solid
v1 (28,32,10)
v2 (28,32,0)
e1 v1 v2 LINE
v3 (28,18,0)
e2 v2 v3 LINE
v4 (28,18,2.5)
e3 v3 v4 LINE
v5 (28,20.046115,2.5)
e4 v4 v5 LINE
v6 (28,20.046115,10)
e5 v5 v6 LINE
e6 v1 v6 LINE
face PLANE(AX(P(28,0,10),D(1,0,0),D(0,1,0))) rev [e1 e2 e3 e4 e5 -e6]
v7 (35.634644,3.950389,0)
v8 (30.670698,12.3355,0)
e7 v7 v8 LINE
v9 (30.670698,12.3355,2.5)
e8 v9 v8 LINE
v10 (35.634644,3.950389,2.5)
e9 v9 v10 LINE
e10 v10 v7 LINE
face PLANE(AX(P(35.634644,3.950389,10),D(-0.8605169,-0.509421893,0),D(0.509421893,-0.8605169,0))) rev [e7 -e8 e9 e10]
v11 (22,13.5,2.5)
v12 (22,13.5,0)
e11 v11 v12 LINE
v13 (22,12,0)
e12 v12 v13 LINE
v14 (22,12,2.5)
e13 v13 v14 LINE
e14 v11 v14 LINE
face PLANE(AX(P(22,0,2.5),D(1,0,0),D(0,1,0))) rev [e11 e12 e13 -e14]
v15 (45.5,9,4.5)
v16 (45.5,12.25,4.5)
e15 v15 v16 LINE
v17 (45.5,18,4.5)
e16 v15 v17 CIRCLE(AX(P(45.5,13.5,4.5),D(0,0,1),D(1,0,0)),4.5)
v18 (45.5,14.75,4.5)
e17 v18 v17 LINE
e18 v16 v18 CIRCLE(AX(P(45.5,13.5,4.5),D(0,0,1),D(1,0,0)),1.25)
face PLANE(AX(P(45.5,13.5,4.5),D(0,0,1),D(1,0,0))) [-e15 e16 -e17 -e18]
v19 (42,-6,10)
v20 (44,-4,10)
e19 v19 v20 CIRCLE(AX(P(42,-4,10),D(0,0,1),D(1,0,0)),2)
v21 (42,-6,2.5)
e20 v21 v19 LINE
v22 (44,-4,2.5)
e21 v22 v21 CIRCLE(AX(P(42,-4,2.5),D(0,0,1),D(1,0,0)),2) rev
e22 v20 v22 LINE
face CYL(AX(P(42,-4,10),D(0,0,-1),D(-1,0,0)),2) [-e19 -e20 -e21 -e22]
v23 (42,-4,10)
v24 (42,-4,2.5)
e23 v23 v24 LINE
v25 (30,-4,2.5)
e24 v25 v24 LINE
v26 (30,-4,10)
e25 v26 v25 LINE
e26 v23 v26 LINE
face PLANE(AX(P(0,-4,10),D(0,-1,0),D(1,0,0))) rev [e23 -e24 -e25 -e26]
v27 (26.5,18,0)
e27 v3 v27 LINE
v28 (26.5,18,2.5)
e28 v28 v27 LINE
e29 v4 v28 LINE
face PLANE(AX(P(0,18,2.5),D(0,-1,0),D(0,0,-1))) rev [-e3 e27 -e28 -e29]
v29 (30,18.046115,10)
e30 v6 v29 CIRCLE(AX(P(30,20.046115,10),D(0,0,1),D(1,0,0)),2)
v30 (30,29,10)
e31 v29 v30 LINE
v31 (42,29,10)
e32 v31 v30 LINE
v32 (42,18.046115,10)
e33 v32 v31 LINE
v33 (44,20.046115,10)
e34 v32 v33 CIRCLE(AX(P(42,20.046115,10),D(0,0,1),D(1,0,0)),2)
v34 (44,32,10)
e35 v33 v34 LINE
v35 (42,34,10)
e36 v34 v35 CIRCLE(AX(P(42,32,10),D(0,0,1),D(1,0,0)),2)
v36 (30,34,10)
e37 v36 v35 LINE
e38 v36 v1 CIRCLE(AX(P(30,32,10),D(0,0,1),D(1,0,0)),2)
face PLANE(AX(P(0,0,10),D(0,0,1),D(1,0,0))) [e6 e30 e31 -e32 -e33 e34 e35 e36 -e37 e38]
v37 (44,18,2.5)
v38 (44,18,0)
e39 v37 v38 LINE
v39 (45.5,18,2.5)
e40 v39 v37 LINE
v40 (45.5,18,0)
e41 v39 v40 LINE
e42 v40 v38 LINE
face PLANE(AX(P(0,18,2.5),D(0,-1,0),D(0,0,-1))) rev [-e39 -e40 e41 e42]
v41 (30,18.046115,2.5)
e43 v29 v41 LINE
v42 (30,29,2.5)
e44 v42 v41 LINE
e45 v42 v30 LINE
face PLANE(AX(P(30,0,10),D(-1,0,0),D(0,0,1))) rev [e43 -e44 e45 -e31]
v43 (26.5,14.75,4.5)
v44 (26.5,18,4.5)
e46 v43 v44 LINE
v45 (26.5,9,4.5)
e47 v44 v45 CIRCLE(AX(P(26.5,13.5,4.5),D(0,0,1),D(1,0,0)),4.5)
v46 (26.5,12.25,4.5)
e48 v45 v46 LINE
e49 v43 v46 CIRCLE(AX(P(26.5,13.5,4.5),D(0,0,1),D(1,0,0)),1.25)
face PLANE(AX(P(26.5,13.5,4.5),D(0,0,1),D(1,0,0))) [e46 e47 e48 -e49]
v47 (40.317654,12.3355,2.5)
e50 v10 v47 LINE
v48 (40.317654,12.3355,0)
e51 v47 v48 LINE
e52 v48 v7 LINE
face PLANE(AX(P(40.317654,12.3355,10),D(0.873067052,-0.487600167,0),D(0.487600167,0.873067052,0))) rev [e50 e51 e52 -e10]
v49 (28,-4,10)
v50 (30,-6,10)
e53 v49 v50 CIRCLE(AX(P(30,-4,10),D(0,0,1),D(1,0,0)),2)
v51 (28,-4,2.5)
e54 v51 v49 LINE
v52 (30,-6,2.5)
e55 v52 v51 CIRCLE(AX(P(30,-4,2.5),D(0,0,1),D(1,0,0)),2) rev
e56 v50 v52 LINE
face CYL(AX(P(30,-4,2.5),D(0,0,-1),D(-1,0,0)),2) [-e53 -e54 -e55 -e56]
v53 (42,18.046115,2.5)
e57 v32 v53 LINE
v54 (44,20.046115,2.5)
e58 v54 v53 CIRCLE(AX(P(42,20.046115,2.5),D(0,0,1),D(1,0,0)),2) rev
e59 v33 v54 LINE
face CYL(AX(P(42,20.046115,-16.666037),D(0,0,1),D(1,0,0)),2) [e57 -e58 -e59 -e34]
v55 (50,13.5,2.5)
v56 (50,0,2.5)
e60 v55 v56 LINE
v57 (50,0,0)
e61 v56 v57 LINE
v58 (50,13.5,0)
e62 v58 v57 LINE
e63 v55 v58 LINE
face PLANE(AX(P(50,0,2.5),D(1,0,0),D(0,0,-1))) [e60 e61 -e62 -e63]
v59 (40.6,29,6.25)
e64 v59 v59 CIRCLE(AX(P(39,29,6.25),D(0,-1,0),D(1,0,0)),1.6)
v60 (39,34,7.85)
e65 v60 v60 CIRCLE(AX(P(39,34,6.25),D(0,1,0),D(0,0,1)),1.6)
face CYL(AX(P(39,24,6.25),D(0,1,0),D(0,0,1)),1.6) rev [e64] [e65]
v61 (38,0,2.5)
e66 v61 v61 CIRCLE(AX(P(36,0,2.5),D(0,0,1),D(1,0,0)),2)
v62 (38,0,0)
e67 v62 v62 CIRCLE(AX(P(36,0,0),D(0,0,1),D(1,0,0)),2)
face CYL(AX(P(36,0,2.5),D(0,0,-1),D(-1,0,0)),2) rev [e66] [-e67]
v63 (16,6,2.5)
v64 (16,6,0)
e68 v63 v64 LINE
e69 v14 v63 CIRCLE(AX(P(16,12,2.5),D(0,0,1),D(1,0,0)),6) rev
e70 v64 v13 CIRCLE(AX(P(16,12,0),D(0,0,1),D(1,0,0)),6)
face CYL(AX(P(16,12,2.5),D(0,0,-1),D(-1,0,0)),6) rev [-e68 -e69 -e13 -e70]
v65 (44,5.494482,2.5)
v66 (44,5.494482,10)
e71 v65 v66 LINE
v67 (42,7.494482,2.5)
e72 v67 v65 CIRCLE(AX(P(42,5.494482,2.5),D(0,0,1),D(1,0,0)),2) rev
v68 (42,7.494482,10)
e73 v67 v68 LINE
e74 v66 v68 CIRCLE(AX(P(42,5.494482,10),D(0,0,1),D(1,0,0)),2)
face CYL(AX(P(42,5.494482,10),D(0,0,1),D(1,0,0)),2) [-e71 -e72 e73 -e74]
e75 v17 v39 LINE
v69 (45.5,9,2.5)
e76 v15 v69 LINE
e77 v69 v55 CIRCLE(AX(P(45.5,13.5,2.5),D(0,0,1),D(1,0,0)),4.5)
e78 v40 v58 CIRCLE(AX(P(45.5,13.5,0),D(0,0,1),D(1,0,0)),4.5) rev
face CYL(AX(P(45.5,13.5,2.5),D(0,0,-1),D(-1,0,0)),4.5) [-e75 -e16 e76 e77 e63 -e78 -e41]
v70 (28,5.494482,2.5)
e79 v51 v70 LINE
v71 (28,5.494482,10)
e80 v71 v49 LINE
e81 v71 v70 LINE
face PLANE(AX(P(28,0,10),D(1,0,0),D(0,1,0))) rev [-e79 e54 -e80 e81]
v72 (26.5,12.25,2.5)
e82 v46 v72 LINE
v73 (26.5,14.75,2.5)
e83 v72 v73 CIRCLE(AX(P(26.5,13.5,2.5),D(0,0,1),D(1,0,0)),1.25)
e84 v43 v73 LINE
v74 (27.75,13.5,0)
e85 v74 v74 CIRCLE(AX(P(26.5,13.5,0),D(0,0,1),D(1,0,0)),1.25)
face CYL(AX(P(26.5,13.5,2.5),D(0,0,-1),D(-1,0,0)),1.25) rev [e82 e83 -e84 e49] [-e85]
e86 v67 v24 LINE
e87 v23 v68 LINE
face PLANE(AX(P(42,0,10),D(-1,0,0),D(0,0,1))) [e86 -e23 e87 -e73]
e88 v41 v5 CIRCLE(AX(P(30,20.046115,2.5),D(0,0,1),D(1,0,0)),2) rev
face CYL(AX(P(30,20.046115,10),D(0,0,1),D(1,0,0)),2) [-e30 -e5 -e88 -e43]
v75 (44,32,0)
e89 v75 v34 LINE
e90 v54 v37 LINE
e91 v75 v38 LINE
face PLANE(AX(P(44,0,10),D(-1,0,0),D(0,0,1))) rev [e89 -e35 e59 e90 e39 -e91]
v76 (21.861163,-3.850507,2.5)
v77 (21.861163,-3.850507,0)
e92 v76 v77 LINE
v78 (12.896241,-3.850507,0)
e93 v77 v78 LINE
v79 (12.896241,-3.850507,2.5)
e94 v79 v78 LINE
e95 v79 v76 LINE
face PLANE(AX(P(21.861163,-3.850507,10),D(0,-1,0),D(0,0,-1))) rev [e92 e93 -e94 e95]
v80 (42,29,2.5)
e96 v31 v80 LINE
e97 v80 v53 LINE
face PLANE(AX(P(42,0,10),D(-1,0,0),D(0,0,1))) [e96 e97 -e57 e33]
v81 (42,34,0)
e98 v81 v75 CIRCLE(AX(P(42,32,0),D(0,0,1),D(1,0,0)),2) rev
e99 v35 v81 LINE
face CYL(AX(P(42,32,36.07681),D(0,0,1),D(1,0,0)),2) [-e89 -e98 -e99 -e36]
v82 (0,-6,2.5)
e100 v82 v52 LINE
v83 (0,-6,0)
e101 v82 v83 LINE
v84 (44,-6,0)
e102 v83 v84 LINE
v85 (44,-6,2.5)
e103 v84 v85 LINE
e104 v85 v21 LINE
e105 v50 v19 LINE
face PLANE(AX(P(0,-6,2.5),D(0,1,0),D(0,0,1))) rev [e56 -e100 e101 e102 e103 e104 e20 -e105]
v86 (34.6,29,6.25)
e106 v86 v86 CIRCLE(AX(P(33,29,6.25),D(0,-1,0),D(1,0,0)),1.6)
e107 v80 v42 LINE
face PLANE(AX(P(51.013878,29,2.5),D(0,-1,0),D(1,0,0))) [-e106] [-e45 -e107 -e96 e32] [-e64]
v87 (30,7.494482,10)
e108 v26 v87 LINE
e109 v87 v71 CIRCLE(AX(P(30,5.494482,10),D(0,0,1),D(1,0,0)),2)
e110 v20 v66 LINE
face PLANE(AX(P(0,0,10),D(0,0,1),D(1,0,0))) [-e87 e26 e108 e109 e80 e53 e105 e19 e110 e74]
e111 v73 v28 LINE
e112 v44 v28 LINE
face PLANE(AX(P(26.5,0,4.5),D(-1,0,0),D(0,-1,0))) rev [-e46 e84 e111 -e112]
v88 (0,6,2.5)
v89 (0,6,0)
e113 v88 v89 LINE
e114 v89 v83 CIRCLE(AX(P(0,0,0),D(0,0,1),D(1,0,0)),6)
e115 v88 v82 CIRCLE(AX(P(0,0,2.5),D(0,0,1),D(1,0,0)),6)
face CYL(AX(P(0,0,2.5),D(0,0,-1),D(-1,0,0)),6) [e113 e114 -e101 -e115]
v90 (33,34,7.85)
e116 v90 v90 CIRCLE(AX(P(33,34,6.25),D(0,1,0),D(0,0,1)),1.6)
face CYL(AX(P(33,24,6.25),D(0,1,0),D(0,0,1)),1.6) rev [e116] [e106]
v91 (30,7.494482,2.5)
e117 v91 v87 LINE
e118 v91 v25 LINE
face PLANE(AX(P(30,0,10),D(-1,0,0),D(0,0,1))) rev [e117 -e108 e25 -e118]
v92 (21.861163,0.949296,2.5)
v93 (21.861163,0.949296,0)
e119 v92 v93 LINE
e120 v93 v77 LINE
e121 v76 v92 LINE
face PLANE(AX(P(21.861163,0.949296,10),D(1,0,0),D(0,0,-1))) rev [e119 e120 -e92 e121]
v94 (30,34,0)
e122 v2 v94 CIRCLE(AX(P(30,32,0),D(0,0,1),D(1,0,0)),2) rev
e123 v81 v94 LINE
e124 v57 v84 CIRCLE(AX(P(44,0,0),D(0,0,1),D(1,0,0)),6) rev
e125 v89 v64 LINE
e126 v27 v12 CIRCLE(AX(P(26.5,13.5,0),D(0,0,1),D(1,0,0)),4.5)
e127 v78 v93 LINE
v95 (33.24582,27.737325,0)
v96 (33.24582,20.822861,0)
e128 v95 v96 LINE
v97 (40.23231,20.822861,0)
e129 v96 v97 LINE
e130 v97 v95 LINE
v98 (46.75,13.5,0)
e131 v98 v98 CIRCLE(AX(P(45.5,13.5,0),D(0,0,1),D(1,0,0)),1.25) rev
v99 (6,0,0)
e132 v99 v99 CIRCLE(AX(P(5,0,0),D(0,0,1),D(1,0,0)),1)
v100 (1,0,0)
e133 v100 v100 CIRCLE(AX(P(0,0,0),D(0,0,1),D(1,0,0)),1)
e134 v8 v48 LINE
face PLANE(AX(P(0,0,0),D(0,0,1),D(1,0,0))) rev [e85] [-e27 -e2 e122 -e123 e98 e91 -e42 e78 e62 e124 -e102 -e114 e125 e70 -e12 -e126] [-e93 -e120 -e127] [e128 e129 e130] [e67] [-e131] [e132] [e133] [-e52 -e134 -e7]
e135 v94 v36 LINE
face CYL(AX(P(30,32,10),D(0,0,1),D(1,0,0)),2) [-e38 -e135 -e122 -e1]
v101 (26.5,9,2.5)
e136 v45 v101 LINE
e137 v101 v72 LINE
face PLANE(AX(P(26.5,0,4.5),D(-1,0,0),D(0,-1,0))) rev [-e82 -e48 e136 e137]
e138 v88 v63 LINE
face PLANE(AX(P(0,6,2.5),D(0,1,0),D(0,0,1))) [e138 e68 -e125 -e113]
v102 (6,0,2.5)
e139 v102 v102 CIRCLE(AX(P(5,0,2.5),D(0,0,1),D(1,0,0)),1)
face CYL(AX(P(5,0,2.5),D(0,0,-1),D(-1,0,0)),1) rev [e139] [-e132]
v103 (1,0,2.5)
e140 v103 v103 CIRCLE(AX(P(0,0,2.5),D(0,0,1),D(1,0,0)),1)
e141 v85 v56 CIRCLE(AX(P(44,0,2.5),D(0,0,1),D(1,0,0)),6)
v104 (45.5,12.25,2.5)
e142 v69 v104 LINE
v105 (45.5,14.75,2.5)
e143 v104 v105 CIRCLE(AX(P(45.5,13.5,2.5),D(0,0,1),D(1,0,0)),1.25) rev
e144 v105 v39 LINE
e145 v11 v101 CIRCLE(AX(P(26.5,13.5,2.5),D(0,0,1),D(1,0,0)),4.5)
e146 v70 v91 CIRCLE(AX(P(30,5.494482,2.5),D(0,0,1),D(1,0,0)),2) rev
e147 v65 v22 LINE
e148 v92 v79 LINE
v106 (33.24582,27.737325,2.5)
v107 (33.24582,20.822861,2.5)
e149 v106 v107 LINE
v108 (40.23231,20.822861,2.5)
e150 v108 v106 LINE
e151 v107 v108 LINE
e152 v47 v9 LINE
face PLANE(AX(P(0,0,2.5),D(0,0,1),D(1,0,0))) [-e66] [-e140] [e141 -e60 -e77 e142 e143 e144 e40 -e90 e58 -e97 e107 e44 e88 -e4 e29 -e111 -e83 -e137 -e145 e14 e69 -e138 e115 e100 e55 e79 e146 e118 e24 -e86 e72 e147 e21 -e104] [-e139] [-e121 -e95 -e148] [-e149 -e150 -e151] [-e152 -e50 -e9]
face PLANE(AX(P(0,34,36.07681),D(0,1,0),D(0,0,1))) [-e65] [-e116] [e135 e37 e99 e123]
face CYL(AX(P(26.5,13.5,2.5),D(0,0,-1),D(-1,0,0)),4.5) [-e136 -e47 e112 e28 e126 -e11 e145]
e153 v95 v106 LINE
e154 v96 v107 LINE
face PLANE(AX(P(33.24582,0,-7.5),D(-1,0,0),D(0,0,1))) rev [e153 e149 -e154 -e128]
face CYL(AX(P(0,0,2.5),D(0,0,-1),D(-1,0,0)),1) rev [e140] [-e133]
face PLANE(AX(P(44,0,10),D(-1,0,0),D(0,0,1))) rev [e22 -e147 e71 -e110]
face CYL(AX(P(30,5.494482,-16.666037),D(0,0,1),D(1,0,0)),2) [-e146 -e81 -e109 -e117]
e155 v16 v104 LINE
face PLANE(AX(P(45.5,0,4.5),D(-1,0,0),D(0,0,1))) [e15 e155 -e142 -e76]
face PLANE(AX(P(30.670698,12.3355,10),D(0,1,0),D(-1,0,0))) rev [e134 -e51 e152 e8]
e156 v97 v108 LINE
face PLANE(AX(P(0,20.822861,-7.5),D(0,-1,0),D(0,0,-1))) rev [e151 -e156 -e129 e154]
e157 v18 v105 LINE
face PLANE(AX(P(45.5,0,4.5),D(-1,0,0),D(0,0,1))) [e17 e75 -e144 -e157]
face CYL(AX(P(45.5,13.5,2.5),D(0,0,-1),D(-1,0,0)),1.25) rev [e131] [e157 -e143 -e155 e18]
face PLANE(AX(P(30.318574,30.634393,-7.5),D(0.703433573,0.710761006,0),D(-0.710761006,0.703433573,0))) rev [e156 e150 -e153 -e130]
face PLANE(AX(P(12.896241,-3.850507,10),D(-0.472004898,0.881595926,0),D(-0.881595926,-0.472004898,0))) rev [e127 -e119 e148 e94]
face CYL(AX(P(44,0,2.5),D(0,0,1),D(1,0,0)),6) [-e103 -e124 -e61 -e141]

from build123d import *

# Parameters (mm, degrees)
SKETCH_1_R          = 1.25
SKETCH_1_R_2        = 1
SKETCH_1_R_3        = 2
EXTRUDE_1_DEPTH     = 2.5
EXTRUDE_2_DEPTH     = 10
EXTRUDE_START       = 2.5
EXTRUDE_4_DEPTH     = 2
FILLET_1_R          = 1
FILLET_2_R          = 6
EXTRUDE_START_2     = 7.5
SKETCH_2_W          = 2
SKETCH_2_H          = 16
EXTRUDE_5_DEPTH     = 7.5
SKETCH_3_W          = 7.5
SKETCH_3_H          = 5
EXTRUDE_6_DEPTH     = 14
SKETCH_4_R          = 1.6
CUT_EXTRUDE_1_DEPTH = 10
CUT_EXTRUDE_2_DEPTH = 10
CUT_EXTRUDE_3_DEPTH = 10
SKETCH_7_W          = 16
SKETCH_7_H          = 2.5
EXTRUDE_7_DEPTH     = 16
SKETCH_8_W          = 16
SKETCH_8_H          = 10.551633207
CUT_EXTRUDE_4_DEPTH = 7.5
CUT_EXTRUDE_5_DEPTH = 10
FILLET_3_R          = 2


with BuildPart() as part:
    # 草图1 → 凸台-拉伸1 (new body)
    with BuildSketch(Plane.XY):
        with BuildLine():
            Line((22, 6), (0, 6))
            ThreePointArc((0, 6), (-6, 0), (0, -6))
            Line((0, -6), (50, -6))
            Line((50, -6), (50, 13.5))
            ThreePointArc((50, 13.5), (48.681980515, 16.681980515), (45.5, 18))
            Line((45.5, 18), (26.5, 18))
            ThreePointArc((26.5, 18), (23.318019485, 16.681980515), (22, 13.5))
            Line((22, 13.5), (22, 6))
        make_face()
        with Locations((45.5, 13.5)):
            Circle(SKETCH_1_R, mode=Mode.SUBTRACT)
        with Locations((26.5, 13.5)):
            Circle(SKETCH_1_R, mode=Mode.SUBTRACT)
        Circle(SKETCH_1_R_2, mode=Mode.SUBTRACT)
        with Locations((5, 0)):
            Circle(SKETCH_1_R_2, mode=Mode.SUBTRACT)
        with Locations((36, 0)):
            Circle(SKETCH_1_R_3, mode=Mode.SUBTRACT)
    extrude(amount=EXTRUDE_1_DEPTH)

    # 草图1<3> → 凸台-拉伸2 (add)
    with BuildSketch(Plane.XY):
        Polygon((28, 9), (28, 6), (28, -6), (44, -6), (44, 9), (42, 9), (42, -4), (30, -4), (30, 9), align=None)
    extrude(amount=EXTRUDE_2_DEPTH)

    # 草图1<5> → 凸台-拉伸4 (add)
    with BuildSketch(Plane.XY.offset(EXTRUDE_START)):
        with BuildLine():
            ThreePointArc((26.5, 18), (22, 13.5), (26.5, 9))
            Line((26.5, 9), (26.5, 12.25))
            ThreePointArc((26.5, 12.25), (25.25, 13.5), (26.5, 14.75))
            Line((26.5, 14.75), (26.5, 18))
        make_face()
        with BuildLine():
            Line((45.5, 12.25), (45.5, 9))
            ThreePointArc((45.5, 9), (50, 13.5), (45.5, 18))
            Line((45.5, 18), (45.5, 14.75))
            ThreePointArc((45.5, 14.75), (46.75, 13.5), (45.5, 12.25))
        make_face()
    extrude(amount=EXTRUDE_4_DEPTH)

    # 圆角1
    fillet_1_edges = [part.edges().sort_by_distance(p)[0] for p in [
        (42, 9, 6.25),
        (30, 9, 6.25),
    ]]
    fillet(fillet_1_edges, radius=FILLET_1_R)

    # 圆角2
    fillet_2_edges = [part.edges().sort_by_distance(p)[0] for p in [
        (50, -6, 1.25),
        (22, 6, 1.25),
    ]]
    fillet(fillet_2_edges, radius=FILLET_2_R)

    # 草图2 → 凸台-拉伸5 (add)
    with BuildSketch(Plane.XY.offset(2.5).offset(EXTRUDE_START_2)):
        with Locations((43, 26)):
            Rectangle(SKETCH_2_W, SKETCH_2_H)
        with BuildLine():
            Line((43, 9), (44, 9))
            Line((44, 9), (44, 18))
            Line((44, 18), (42, 18))
            Line((42, 18), (42, 8))
            ThreePointArc((42, 8), (42.292893219, 8.707106781), (43, 9))
        make_face()
        with BuildLine():
            Line((28, 18), (28, 9))
            Line((28, 9), (29, 9))
            ThreePointArc((29, 9), (29.707106781, 8.707106781), (30, 8))
            Line((30, 8), (30, 18))
            Line((30, 18), (28, 18))
        make_face()
        with Locations((29, 26)):
            Rectangle(SKETCH_2_W, SKETCH_2_H)
    extrude(amount=-EXTRUDE_5_DEPTH)

    # 草图3 → 凸台-拉伸6 (add)
    with BuildSketch(Plane.ZY.offset(-28)):
        with Locations((6.25, 31.5)):
            Rectangle(SKETCH_3_W, SKETCH_3_H)
    extrude(amount=-EXTRUDE_6_DEPTH)

    # 草图4 → 切除-拉伸1 (cut)
    with BuildSketch(Plane(origin=(0, 34, 0), x_dir=(1, 0, 0), z_dir=(0, 1, 0))):
        with Locations(Location((33, -6.25, 0), (0, 0, 270))):
            Circle(SKETCH_4_R)
        with Locations(Location((39, -6.25, 0), (0, 0, 270))):
            Circle(SKETCH_4_R)
    extrude(amount=-CUT_EXTRUDE_1_DEPTH, mode=Mode.SUBTRACT)

    # 草图5 → 切除-拉伸2 (cut)
    with BuildSketch(Plane(origin=(0, 0, 0), x_dir=(-1, 0, 0), z_dir=(0, 0, -1))):
        Polygon((-30.670698378, 12.335500495), (-40.317654114, 12.335500495), (-35.634644198, 3.950389209), align=None)
    extrude(amount=-CUT_EXTRUDE_2_DEPTH, mode=Mode.SUBTRACT)

    # 草图6 → 切除-拉伸3 (cut)
    with BuildSketch(Plane(origin=(0, 0, 0), x_dir=(-1, 0, 0), z_dir=(0, 0, -1))):
        Polygon((-21.861162721, 0.94929577), (-21.861162721, -3.850507305), (-12.896241274, -3.850507305), align=None)
    extrude(amount=-CUT_EXTRUDE_3_DEPTH, mode=Mode.SUBTRACT)

    # 草图7 → 凸台-拉伸7 (add)
    with BuildSketch(Plane(origin=(0, 18, 0), x_dir=(1, 0, 0), z_dir=(0, 1, 0))):
        with Locations((36, -1.25)):
            Rectangle(SKETCH_7_W, SKETCH_7_H)
    extrude(amount=EXTRUDE_7_DEPTH)

    # 草图8 → 切除-拉伸4 (cut)
    with BuildSketch(Plane.XY.offset(10)):
        with Locations((36, 12.770298386)):
            Rectangle(SKETCH_8_W, SKETCH_8_H)
    extrude(amount=-CUT_EXTRUDE_4_DEPTH, mode=Mode.SUBTRACT)

    # 草图9 → 切除-拉伸5 (cut)
    with BuildSketch(Plane.XY.offset(2.5)):
        Polygon((33.245819602, 20.82286057), (40.232309823, 20.82286057), (33.245819602, 27.737325118), align=None)
    extrude(amount=-CUT_EXTRUDE_5_DEPTH, mode=Mode.SUBTRACT)

    # 圆角3
    fillet_3_edges = [part.edges().sort_by_distance(p)[0] for p in [
        (44, 34, 5),
        (28, 34, 5),
        (28, 18.046114989, 6.25),
        (28, 7.494481782, 6.25),
        (44, 18.046114989, 6.25),
        (44, 7.494481782, 6.25),
        (28, -6, 6.25),
        (44, -6, 6.25),
    ]]
    fillet(fillet_3_edges, radius=FILLET_3_R - 0.0001)  # a hair under: the kernel refuses the full size


solid = part.part
